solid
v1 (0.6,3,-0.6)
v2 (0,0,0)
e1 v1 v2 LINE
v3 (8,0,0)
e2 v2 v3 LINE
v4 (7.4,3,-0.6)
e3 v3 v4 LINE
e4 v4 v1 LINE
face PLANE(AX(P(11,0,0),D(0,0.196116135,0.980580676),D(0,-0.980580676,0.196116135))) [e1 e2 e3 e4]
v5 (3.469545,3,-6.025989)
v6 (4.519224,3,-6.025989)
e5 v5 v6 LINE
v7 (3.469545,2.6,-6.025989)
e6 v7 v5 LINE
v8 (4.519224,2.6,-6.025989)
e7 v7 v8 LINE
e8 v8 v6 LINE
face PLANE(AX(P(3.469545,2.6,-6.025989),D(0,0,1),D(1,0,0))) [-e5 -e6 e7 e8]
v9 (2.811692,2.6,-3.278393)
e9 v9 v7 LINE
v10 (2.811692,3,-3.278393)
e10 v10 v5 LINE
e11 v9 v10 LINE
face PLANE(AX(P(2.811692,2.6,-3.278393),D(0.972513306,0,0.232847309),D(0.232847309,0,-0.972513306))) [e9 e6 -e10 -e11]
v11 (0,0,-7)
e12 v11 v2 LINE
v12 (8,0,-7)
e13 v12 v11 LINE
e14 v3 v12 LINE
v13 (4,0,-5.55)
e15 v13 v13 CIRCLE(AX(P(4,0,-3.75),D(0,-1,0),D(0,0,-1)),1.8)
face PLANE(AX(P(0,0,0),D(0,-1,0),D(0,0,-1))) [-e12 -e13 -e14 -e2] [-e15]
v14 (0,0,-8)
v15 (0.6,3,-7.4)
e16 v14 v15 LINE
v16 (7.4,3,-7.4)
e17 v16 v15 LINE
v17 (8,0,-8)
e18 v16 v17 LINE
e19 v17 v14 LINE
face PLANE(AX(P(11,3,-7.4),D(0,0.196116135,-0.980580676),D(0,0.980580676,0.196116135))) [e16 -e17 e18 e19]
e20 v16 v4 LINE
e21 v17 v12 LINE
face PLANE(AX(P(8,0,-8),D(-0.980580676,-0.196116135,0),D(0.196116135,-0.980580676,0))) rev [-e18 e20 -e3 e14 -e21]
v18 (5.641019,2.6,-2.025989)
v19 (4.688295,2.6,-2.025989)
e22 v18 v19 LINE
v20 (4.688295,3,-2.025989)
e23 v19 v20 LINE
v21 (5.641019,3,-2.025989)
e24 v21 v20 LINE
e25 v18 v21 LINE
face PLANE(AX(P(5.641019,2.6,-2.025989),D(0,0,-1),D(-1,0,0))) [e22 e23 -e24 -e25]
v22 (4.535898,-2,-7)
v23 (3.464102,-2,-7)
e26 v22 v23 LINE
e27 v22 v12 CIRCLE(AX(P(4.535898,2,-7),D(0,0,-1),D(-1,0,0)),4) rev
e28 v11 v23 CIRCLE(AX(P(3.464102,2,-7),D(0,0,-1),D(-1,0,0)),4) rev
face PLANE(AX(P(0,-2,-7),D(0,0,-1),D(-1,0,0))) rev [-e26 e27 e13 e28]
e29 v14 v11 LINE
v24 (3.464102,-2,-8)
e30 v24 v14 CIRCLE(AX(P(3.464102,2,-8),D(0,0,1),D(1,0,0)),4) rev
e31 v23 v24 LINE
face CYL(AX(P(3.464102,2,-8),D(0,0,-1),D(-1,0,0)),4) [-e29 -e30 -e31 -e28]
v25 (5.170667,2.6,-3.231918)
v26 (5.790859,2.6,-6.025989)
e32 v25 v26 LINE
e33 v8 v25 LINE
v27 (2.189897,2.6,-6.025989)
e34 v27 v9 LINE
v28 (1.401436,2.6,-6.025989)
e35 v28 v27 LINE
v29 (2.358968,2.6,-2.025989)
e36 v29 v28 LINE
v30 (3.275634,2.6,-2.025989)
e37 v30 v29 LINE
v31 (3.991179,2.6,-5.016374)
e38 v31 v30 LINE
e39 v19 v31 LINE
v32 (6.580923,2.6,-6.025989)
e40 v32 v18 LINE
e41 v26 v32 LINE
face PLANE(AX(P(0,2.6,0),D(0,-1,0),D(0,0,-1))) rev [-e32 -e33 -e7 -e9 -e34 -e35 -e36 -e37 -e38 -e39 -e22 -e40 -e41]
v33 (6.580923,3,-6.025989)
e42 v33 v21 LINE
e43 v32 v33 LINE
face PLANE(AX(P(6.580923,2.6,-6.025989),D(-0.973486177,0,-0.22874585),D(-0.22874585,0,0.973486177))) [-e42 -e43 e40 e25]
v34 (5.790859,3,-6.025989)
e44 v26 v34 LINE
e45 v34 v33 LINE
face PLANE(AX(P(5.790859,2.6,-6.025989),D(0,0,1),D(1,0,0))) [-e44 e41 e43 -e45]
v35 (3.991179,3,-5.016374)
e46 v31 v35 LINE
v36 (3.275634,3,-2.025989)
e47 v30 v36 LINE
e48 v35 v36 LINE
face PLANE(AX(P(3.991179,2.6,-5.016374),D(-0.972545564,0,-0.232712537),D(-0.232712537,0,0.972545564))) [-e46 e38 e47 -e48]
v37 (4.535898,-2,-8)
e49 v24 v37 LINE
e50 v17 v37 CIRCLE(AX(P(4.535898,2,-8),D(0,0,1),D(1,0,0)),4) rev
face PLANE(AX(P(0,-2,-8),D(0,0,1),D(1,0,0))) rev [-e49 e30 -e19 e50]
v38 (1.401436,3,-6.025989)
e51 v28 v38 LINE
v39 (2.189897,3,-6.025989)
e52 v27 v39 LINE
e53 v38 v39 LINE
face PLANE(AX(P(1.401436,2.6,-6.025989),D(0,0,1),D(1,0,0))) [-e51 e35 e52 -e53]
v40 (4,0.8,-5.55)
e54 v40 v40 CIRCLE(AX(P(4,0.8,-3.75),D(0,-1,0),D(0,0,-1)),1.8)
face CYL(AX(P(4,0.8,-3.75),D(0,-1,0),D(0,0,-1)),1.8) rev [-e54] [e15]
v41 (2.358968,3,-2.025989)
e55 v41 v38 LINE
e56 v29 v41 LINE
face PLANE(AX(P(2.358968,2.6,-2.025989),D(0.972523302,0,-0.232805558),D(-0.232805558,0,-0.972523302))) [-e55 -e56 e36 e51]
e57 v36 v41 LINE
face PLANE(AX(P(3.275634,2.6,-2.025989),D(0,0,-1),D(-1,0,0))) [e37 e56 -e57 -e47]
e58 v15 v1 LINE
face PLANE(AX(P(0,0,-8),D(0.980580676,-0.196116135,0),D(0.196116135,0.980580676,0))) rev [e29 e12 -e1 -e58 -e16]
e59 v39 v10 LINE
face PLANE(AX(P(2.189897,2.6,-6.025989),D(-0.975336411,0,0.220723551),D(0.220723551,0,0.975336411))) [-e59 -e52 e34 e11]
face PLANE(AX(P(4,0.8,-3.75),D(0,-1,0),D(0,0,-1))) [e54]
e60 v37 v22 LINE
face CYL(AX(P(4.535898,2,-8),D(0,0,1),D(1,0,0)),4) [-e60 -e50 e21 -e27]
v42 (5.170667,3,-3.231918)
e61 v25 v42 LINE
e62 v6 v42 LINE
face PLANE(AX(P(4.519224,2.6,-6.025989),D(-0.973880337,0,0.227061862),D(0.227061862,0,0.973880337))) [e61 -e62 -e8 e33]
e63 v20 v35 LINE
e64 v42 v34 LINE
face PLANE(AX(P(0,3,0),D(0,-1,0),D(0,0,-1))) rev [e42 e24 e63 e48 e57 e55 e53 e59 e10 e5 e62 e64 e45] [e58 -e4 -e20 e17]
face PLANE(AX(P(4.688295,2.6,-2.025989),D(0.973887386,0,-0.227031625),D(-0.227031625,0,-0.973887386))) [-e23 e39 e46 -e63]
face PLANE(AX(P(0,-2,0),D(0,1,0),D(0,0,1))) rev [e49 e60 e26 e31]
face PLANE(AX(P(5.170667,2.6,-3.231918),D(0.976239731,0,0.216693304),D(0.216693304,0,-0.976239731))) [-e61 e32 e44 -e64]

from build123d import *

# Parameters (mm, degrees)
SKETCH1_W               = 8
SKETCH1_H               = 8
BOSS_EXTRUDE1_DEPTH     = 3
CUT_EXTRUDE1_DEPTH      = 12.704699911
CUT_EXTRUDE1_DEPTH_BACK = 12.704699911
CUT_EXTRUDE2_DEPTH      = 11
SKETCH4_R               = 1.8
CUT_EXTRUDE3_DEPTH      = 0.8
SKETCH5_W               = 8
SKETCH5_H               = 1
BOSS_EXTRUDE2_DEPTH     = 2
FILLET1_R               = 4
CUT_EXTRUDE4_DEPTH      = 0.4


with BuildPart() as part:
    # Sketch1 → Boss-Extrude1 (new body)
    with BuildSketch(Plane(origin=(0, 0, 0), x_dir=(1, 0, 0), z_dir=(0, 1, 0))):
        with Locations((4, 4)):
            Rectangle(SKETCH1_W, SKETCH1_H)
    extrude(amount=BOSS_EXTRUDE1_DEPTH)

    # Sketch2 → Cut-Extrude1 (cut, two sides: drawn at the far end of the back side and taken through both)
    with BuildSketch(Plane.XY.offset(-CUT_EXTRUDE1_DEPTH_BACK)):
        Polygon((0, 0), (0.6, 3), (0, 3), align=None)
        Polygon((8, 0), (7.4, 3), (8, 3), align=None)
    extrude(amount=CUT_EXTRUDE1_DEPTH + CUT_EXTRUDE1_DEPTH_BACK, mode=Mode.SUBTRACT)

    # Sketch3 → Cut-Extrude2 (cut)
    with BuildSketch(Plane(origin=(0, 0, 0), x_dir=(0, 0, -1), z_dir=(1, 0, 0))):
        Polygon((0, 0), (0.6, 3), (0, 3), align=None)
        Polygon((8, 3), (7.4, 3), (8, 0), align=None)
    extrude(amount=CUT_EXTRUDE2_DEPTH, mode=Mode.SUBTRACT)

    # Sketch4 → Cut-Extrude3 (cut)
    with BuildSketch(Plane.XZ):
        with Locations(Location((4, -3.75, 0), (0, 0, 270))):
            Circle(SKETCH4_R)
    extrude(amount=-CUT_EXTRUDE3_DEPTH, mode=Mode.SUBTRACT)

    # Sketch5 → Boss-Extrude2 (add)
    with BuildSketch(Plane.XZ):
        with Locations((4, -7.5)):
            Rectangle(SKETCH5_W, SKETCH5_H)
    extrude(amount=BOSS_EXTRUDE2_DEPTH)

    # Fillet1
    # the kernel refuses this fillet: 4 mm, written as the material it takes off along each edge
    with BuildSketch(Plane(origin=(8, -2, -16.660254038), x_dir=(0, 1, 0), z_dir=(0, 0, 1)), Plane(origin=(0, -2, 1.660254038), x_dir=(0, 1, 0), z_dir=(0, 0, -1))) as fillet1_piece_1:
        with BuildLine():
            CenterArc((4, 3.464101615), FILLET1_R, 180, 60)
            Line((0, 3.464101615), (-0.08, 3.464101615))
            Line((-0.08, 3.464101615), (-0.08, 0))
            Line((-0.08, 0), (0, -0.08))
            ThreePointArc((0, -0.08), (1, -0.08), (1.96, -0.069282032))
            Line((1.96, -0.069282032), (2, 0))
        make_face()
    extrude(amount=18.320508076, mode=Mode.SUBTRACT)

    # Sketch6 → Cut-Extrude4 (cut)
    with BuildSketch(Plane(origin=(0, 3, 0), x_dir=(1, 0, 0), z_dir=(0, 1, 0))):
        Polygon((2.358967796, 2.025988971), (1.401435745, 6.025988971), (2.189897284, 6.025988971), (2.811692155, 3.278392817), (3.469544719, 6.025988971), (4.519224207, 6.025988971), (5.170666514, 3.231918458), (5.790858822, 6.025988971), (6.580922925, 6.025988971), (5.641019078, 2.025988971), (4.688294719, 2.025988971), (3.991179335, 5.016373586), (3.275634463, 2.025988971), align=None)
    extrude(amount=-CUT_EXTRUDE4_DEPTH, mode=Mode.SUBTRACT)


solid = part.part
